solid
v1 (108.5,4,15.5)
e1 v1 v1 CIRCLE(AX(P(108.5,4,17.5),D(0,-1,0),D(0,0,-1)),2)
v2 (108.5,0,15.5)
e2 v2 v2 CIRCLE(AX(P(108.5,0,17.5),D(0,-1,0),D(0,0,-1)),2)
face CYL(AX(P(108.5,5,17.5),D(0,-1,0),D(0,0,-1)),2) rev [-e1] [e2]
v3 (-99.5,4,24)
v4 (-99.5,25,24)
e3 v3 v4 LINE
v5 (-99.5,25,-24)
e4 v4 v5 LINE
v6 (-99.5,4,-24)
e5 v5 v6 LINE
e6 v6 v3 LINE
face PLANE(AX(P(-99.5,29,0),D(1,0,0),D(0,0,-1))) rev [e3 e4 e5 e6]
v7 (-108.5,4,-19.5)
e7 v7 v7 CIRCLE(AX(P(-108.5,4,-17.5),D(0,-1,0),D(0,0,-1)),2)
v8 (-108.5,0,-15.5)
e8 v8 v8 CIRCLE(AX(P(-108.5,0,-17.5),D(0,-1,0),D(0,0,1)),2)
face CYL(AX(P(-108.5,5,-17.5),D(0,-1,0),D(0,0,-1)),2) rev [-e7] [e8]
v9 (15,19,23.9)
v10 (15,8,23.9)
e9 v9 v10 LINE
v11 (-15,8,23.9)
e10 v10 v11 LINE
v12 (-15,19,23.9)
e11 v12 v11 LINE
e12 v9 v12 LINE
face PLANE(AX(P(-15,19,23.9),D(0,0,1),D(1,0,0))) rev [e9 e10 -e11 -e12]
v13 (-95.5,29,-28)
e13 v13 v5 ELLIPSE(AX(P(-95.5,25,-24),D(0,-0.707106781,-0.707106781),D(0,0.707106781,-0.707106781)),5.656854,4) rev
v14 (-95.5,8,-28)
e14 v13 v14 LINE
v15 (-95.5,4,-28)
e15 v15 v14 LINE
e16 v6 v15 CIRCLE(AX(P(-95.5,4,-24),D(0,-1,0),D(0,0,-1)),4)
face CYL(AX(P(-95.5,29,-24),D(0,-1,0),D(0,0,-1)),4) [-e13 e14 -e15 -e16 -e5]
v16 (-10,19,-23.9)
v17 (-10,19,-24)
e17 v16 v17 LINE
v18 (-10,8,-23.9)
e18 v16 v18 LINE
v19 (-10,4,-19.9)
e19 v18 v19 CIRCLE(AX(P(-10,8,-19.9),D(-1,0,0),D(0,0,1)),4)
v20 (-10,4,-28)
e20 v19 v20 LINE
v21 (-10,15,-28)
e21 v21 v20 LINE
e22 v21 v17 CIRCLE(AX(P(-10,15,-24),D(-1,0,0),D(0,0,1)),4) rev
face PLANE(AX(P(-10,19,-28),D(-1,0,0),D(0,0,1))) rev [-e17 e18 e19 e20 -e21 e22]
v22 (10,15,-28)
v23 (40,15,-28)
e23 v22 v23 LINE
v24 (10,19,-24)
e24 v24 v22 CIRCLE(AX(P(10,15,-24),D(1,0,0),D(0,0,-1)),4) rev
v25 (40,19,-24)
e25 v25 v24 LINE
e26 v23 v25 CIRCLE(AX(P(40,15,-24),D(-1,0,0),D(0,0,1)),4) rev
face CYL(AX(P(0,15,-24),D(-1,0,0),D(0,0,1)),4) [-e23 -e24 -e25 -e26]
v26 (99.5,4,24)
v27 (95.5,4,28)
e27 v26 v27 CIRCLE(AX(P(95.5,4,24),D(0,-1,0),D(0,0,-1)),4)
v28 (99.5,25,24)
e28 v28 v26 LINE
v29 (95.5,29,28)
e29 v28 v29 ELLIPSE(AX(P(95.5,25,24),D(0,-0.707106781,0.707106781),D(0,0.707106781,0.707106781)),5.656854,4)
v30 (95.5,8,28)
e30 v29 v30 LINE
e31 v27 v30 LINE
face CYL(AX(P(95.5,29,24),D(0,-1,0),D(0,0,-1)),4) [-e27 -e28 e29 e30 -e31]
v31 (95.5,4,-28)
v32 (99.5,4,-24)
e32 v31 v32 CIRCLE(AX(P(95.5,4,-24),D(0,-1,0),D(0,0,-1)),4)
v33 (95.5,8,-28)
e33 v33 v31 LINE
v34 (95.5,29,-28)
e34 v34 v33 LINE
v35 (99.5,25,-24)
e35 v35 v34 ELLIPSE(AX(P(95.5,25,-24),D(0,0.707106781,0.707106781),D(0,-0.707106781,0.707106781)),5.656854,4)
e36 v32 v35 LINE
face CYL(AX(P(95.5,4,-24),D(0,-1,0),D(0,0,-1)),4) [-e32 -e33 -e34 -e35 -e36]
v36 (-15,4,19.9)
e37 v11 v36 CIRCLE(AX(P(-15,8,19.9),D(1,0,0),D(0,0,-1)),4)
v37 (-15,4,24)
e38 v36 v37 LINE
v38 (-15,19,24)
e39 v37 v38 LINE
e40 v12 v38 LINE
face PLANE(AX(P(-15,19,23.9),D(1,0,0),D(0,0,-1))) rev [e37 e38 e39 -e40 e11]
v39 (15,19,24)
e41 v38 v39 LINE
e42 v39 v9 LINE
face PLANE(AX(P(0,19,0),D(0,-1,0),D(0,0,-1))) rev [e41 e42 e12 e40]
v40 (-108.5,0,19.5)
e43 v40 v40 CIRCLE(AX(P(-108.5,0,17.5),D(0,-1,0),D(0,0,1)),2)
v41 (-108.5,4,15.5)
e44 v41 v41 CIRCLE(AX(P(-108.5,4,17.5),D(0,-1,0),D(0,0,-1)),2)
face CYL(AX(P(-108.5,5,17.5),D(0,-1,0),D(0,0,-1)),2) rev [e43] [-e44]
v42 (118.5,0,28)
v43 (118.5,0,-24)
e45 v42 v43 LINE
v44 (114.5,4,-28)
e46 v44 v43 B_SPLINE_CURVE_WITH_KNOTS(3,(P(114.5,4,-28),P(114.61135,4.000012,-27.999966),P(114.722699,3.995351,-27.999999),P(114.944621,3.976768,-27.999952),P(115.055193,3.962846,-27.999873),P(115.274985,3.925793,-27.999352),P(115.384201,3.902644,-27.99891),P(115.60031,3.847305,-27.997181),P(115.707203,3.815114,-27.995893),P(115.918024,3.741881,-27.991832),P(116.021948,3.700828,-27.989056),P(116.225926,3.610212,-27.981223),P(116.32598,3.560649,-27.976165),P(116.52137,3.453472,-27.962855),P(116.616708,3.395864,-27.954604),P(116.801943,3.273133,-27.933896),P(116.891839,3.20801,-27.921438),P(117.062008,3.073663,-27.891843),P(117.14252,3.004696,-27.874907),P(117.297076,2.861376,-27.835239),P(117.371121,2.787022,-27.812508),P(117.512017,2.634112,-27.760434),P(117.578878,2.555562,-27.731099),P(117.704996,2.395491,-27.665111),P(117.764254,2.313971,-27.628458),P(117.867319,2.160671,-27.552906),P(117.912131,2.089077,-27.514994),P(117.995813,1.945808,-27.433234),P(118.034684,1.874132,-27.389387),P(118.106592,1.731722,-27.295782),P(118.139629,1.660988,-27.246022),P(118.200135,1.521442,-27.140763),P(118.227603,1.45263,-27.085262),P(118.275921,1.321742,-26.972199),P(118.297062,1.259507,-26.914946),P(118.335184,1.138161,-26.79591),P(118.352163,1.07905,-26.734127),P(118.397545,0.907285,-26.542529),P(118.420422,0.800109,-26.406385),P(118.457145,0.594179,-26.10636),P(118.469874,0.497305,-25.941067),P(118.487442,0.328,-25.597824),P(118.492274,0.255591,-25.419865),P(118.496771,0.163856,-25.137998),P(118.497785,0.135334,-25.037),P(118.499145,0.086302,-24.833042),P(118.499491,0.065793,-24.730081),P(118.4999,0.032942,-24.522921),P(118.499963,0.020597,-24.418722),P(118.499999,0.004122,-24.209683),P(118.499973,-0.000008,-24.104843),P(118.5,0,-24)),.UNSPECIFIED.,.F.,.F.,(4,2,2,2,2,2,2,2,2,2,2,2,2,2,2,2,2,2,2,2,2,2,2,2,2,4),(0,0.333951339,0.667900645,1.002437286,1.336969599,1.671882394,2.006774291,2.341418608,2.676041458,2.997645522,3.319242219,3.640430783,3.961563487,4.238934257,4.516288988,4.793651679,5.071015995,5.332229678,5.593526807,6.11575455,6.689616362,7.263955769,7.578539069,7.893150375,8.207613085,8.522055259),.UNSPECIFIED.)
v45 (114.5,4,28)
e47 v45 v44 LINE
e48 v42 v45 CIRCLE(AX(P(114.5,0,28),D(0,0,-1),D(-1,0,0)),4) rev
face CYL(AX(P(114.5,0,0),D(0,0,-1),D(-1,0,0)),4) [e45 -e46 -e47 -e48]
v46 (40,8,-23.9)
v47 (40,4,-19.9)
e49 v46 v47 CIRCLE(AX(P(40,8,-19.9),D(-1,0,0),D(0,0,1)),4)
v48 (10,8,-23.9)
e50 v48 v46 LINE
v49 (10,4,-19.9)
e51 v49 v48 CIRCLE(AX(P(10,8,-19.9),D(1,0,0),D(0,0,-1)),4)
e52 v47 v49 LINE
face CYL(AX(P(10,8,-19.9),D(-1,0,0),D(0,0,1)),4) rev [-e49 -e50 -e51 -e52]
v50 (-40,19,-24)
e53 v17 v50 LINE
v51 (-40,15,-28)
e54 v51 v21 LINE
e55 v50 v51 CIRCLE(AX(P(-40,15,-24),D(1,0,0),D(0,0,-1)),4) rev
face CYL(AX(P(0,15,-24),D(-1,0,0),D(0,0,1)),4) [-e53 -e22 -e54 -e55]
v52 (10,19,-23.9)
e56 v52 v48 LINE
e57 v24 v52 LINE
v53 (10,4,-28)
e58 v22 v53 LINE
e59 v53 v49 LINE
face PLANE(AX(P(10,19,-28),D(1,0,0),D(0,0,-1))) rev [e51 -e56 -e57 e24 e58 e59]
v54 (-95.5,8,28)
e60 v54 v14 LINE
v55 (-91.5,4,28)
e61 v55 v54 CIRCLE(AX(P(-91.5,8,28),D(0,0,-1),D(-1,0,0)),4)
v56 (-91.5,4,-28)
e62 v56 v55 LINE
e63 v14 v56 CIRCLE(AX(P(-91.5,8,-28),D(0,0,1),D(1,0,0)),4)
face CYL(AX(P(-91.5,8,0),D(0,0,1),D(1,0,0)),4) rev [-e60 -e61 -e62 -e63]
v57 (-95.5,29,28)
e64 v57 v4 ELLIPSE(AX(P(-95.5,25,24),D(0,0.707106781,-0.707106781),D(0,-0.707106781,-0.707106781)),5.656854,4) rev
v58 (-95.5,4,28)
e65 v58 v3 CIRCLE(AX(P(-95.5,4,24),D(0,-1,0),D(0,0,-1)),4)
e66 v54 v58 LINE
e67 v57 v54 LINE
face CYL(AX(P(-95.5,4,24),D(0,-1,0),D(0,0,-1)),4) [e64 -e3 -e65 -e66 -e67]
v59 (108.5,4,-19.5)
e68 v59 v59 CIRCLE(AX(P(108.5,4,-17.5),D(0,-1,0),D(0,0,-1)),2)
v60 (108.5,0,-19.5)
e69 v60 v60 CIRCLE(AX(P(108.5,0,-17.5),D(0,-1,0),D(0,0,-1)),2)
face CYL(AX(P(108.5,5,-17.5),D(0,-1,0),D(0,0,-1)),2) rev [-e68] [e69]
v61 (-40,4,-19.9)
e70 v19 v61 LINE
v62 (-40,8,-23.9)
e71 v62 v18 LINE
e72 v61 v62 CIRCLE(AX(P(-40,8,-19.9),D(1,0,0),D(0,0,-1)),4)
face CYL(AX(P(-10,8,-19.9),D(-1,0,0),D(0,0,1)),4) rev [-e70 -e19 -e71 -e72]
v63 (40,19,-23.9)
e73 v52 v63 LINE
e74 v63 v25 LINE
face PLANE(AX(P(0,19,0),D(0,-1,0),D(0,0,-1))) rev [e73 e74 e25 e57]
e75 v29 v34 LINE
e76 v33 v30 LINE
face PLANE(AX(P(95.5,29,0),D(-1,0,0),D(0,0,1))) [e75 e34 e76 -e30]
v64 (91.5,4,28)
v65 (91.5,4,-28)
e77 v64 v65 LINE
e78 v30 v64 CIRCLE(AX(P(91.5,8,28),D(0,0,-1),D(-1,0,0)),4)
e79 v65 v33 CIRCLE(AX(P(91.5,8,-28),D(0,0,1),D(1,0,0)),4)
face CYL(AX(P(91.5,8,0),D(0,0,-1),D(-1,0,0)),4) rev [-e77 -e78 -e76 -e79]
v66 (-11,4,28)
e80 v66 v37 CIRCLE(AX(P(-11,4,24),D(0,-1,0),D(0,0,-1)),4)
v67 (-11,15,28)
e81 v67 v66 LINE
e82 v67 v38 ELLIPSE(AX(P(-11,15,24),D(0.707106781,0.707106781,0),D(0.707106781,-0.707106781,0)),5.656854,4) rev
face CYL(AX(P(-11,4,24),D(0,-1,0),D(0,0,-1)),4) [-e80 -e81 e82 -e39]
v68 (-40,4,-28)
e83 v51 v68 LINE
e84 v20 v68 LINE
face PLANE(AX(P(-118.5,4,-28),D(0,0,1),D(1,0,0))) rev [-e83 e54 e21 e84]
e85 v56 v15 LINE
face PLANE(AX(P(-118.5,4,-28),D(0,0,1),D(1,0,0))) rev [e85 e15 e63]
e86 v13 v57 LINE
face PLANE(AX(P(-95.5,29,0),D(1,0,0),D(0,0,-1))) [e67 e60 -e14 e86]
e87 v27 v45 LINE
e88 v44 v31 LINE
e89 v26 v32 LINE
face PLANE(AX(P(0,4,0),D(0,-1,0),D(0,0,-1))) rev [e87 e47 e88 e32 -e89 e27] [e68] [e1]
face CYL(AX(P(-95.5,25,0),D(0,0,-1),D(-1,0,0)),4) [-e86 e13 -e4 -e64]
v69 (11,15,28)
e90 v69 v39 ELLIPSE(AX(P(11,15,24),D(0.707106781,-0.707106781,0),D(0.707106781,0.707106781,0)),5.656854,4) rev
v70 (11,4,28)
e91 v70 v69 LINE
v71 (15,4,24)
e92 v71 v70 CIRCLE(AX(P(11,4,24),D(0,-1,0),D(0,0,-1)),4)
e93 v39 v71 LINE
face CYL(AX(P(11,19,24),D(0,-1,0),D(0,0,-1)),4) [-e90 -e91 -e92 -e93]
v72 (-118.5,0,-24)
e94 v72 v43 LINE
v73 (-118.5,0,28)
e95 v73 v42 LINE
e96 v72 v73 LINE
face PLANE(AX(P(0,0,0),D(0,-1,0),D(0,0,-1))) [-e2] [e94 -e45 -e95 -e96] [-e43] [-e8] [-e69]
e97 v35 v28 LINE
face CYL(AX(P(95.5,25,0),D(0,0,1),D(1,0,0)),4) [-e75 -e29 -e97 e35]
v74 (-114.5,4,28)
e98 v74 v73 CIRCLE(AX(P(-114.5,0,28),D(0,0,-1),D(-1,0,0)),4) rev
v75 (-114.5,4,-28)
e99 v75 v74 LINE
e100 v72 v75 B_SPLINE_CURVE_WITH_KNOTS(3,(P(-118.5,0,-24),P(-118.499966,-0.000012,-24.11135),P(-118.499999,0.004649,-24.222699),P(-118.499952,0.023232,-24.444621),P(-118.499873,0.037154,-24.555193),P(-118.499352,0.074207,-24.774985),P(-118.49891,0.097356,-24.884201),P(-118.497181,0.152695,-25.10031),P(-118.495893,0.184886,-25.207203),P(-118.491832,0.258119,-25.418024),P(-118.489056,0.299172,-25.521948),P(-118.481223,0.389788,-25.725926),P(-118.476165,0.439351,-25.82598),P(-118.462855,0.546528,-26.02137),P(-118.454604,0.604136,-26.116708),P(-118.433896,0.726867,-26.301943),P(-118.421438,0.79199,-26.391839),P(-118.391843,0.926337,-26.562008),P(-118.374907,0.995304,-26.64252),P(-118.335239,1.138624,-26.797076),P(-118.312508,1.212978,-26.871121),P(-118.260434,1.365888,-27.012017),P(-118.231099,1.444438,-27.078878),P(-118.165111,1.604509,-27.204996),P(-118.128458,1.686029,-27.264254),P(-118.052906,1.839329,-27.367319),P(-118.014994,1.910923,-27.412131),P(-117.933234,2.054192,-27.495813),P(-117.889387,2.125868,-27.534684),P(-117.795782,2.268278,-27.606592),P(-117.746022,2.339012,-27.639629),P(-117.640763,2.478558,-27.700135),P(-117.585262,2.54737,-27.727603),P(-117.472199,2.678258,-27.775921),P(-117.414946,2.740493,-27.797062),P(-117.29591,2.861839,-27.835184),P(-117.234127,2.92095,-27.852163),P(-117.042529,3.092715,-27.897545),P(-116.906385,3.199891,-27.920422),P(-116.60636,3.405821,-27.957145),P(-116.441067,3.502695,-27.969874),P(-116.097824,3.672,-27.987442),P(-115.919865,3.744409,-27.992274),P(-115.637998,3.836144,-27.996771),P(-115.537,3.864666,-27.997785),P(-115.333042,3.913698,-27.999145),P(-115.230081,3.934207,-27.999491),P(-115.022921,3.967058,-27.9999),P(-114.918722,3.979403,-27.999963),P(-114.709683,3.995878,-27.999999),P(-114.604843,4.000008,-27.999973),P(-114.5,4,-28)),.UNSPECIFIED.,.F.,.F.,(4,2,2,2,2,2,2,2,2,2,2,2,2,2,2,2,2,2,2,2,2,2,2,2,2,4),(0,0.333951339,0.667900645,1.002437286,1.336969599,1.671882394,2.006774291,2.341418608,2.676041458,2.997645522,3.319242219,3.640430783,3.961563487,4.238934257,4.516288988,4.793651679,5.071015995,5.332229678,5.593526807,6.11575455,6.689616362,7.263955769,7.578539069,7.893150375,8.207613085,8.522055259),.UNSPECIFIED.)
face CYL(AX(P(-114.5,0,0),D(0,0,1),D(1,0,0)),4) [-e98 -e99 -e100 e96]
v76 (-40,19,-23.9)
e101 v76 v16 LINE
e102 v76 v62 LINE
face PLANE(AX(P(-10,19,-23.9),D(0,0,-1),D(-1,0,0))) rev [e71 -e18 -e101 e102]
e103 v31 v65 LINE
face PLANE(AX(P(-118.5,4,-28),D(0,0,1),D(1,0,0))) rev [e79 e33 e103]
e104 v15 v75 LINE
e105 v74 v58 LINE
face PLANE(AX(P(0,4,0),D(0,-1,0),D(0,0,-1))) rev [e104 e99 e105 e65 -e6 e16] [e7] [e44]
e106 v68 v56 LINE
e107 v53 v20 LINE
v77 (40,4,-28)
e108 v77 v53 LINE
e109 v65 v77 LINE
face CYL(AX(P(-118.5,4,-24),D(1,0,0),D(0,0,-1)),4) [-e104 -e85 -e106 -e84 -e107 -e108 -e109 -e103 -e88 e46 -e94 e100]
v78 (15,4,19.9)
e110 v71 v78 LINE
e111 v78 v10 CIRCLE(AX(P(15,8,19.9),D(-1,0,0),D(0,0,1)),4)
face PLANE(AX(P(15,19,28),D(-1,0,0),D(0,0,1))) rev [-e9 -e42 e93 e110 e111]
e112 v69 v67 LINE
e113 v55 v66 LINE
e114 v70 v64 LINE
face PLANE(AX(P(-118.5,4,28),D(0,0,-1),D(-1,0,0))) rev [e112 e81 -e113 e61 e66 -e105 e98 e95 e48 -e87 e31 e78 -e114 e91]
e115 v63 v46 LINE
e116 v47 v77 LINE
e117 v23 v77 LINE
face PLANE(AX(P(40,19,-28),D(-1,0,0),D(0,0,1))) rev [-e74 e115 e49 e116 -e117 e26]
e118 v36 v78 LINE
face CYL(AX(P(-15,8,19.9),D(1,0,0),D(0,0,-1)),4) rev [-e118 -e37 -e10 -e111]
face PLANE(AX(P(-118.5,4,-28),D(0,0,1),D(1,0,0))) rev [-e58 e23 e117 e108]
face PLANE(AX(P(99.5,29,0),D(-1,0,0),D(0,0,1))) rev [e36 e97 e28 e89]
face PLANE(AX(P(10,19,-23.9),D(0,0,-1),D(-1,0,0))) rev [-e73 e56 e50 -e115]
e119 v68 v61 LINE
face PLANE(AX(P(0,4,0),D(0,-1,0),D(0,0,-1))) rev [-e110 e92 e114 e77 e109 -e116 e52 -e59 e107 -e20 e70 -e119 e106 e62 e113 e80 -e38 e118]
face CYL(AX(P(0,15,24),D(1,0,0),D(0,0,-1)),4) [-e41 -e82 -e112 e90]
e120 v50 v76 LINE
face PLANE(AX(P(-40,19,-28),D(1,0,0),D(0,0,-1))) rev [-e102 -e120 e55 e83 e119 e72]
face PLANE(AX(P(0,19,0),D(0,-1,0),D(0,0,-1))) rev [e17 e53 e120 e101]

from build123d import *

# Parameters (mm, degrees)
SKETCH1_W           = 237
SKETCH1_H           = 56
BOSS_EXTRUDE1_DEPTH = 4
SKETCH2_R           = 2
CUT_EXTRUDE1_DEPTH  = 5
SKETCH5_W           = 30
SKETCH5_H           = 4.1
BOSS_EXTRUDE2_DEPTH = 15
SKETCH6_W           = 4
SKETCH6_H           = 56
BOSS_EXTRUDE3_DEPTH = 25
FILLET1_START       = -119
FILLET1_DEPTH       = 238
FILLET3_R           = 4
FILLET4_R           = 4
FILLET5_R           = 4
FILLET6_R           = 4


with BuildPart() as part:
    # Sketch1 → Boss-Extrude1 (new body)
    with BuildSketch(Plane(origin=(0, 0, 0), x_dir=(1, 0, 0), z_dir=(0, 1, 0))):
        Rectangle(SKETCH1_W, SKETCH1_H)
    extrude(amount=BOSS_EXTRUDE1_DEPTH)

    # Sketch2 → Cut-Extrude1 (cut)
    with BuildSketch(Plane.XZ):
        with Locations(Location((108.5, 17.5, 0), (0, 0, 270))):
            Circle(SKETCH2_R)
        with Locations(Location((108.5, -17.5, 0), (0, 0, 270))):
            Circle(SKETCH2_R)
        with Locations(Location((-108.5, -17.5, 0), (0, 0, 270))):
            Circle(SKETCH2_R)
        with Locations(Location((-108.5, 17.5, 0), (0, 0, 270))):
            Circle(SKETCH2_R)
    extrude(amount=-CUT_EXTRUDE1_DEPTH, mode=Mode.SUBTRACT)

    # Sketch5 → Boss-Extrude2 (add)
    with BuildSketch(Plane(origin=(0, 4, 0), x_dir=(1, 0, 0), z_dir=(0, 1, 0))):
        with Locations((0, -25.95)):
            Rectangle(SKETCH5_W, SKETCH5_H)
        with Locations((25, 25.95)):
            Rectangle(SKETCH5_W, SKETCH5_H)
        with Locations((-25, 25.95)):
            Rectangle(SKETCH5_W, SKETCH5_H)
    extrude(amount=BOSS_EXTRUDE2_DEPTH)

    # Sketch6 → Boss-Extrude3 (add)
    with BuildSketch(Plane(origin=(0, 4, 0), x_dir=(1, 0, 0), z_dir=(0, 1, 0))):
        with Locations((-97.5, 0)):
            Rectangle(SKETCH6_W, SKETCH6_H)
        with Locations((97.5, 0)):
            Rectangle(SKETCH6_W, SKETCH6_H)
    extrude(amount=BOSS_EXTRUDE3_DEPTH)

    # Fillet1: read off the stored shape, not the designer's step
    # Fillet1 outline → Fillet1 (cut)
    with BuildSketch(Plane.YZ.offset(FILLET1_START)):
        with BuildLine():
            ThreePointArc((4, -28), (1.171572875, -26.828427125), (0, -24))
            Line((0, -24), (0, -28))
            Line((0, -28), (4, -28))
        make_face()
    extrude(amount=FILLET1_DEPTH, mode=Mode.SUBTRACT)

    # Fillet3
    fillet3_edges = [part.edges().sort_by_distance(p)[0] for p in [
        (0, 4, 23.9),
        (25, 4, -23.9),
        (-25, 4, -23.9),
        (-95.5, 4, 0),
        (95.5, 4, 0),
    ]]
    fillet(fillet3_edges, radius=FILLET3_R)

    # Fillet4
    # the kernel refuses this fillet: 4 mm, written as the material it takes off along each edge
    with BuildSketch(Plane(origin=(-118.5, 4, -38), x_dir=(0, -1, 0), z_dir=(0, 0, 1)), Plane(origin=(-99.5, 29, -38), x_dir=(0, -1, 0), z_dir=(0, 0, 1))) as fillet4_piece_1:
        with BuildLine():
            CenterArc((FILLET4_R, FILLET4_R), FILLET4_R, 180, 90)
            Line((0, FILLET4_R), (0, 0))
            Line((0, 0), (FILLET4_R, 0))
        make_face()
    extrude(amount=76, mode=Mode.SUBTRACT)
    with BuildSketch(Plane(origin=(118.5, 4, 38), x_dir=(-1, 0, 0), z_dir=(0, 0, -1)), Plane(origin=(99.5, 29, 38), x_dir=(-1, 0, 0), z_dir=(0, 0, -1))) as fillet4_piece_2:
        with BuildLine():
            CenterArc((FILLET4_R, -FILLET4_R), FILLET4_R, 90, 90)
            Line((0, -FILLET4_R), (0, 0))
            Line((0, 0), (FILLET4_R, 0))
        make_face()
    extrude(amount=76, mode=Mode.SUBTRACT)
    with BuildSketch(Plane(origin=(-99.5, 4, -28), x_dir=(1, 0, 0), z_dir=(0, 1, 0)), Plane(origin=(99.5, 4, 28), x_dir=(-1, 0, 0), z_dir=(0, 1, 0))) as fillet4_piece_3:
        with BuildLine():
            CenterArc((FILLET4_R, -FILLET4_R), FILLET4_R, 90, 90)
            Line((0, -FILLET4_R), (0, 0))
            Line((0, 0), (FILLET4_R, 0))
        make_face()
    extrude(amount=35, mode=Mode.SUBTRACT)
    with BuildSketch(Plane(origin=(-99.5, 4, 28), x_dir=(1, 0, 0), z_dir=(0, 1, 0)), Plane(origin=(99.5, 4, -28), x_dir=(-1, 0, 0), z_dir=(0, 1, 0))) as fillet4_piece_4:
        with BuildLine():
            CenterArc((FILLET4_R, FILLET4_R), FILLET4_R, 180, 90)
            Line((0, FILLET4_R), (0, 0))
            Line((0, 0), (FILLET4_R, 0))
        make_face()
    extrude(amount=35, mode=Mode.SUBTRACT)

    # Fillet5
    fillet5_edges = [part.edges().sort_by_distance(p)[0] for p in [
        (15, 11.5, 28),
        (-15, 11.5, 28),
        (0, 19, 28),
    ]]
    fillet(fillet5_edges, radius=FILLET5_R)

    # Fillet6
    fillet6_edges = [part.edges().sort_by_distance(p)[0] for p in [
        (25, 19, -28),
        (-25, 19, -28),
    ]]
    fillet(fillet6_edges, radius=FILLET6_R)


solid = part.part
